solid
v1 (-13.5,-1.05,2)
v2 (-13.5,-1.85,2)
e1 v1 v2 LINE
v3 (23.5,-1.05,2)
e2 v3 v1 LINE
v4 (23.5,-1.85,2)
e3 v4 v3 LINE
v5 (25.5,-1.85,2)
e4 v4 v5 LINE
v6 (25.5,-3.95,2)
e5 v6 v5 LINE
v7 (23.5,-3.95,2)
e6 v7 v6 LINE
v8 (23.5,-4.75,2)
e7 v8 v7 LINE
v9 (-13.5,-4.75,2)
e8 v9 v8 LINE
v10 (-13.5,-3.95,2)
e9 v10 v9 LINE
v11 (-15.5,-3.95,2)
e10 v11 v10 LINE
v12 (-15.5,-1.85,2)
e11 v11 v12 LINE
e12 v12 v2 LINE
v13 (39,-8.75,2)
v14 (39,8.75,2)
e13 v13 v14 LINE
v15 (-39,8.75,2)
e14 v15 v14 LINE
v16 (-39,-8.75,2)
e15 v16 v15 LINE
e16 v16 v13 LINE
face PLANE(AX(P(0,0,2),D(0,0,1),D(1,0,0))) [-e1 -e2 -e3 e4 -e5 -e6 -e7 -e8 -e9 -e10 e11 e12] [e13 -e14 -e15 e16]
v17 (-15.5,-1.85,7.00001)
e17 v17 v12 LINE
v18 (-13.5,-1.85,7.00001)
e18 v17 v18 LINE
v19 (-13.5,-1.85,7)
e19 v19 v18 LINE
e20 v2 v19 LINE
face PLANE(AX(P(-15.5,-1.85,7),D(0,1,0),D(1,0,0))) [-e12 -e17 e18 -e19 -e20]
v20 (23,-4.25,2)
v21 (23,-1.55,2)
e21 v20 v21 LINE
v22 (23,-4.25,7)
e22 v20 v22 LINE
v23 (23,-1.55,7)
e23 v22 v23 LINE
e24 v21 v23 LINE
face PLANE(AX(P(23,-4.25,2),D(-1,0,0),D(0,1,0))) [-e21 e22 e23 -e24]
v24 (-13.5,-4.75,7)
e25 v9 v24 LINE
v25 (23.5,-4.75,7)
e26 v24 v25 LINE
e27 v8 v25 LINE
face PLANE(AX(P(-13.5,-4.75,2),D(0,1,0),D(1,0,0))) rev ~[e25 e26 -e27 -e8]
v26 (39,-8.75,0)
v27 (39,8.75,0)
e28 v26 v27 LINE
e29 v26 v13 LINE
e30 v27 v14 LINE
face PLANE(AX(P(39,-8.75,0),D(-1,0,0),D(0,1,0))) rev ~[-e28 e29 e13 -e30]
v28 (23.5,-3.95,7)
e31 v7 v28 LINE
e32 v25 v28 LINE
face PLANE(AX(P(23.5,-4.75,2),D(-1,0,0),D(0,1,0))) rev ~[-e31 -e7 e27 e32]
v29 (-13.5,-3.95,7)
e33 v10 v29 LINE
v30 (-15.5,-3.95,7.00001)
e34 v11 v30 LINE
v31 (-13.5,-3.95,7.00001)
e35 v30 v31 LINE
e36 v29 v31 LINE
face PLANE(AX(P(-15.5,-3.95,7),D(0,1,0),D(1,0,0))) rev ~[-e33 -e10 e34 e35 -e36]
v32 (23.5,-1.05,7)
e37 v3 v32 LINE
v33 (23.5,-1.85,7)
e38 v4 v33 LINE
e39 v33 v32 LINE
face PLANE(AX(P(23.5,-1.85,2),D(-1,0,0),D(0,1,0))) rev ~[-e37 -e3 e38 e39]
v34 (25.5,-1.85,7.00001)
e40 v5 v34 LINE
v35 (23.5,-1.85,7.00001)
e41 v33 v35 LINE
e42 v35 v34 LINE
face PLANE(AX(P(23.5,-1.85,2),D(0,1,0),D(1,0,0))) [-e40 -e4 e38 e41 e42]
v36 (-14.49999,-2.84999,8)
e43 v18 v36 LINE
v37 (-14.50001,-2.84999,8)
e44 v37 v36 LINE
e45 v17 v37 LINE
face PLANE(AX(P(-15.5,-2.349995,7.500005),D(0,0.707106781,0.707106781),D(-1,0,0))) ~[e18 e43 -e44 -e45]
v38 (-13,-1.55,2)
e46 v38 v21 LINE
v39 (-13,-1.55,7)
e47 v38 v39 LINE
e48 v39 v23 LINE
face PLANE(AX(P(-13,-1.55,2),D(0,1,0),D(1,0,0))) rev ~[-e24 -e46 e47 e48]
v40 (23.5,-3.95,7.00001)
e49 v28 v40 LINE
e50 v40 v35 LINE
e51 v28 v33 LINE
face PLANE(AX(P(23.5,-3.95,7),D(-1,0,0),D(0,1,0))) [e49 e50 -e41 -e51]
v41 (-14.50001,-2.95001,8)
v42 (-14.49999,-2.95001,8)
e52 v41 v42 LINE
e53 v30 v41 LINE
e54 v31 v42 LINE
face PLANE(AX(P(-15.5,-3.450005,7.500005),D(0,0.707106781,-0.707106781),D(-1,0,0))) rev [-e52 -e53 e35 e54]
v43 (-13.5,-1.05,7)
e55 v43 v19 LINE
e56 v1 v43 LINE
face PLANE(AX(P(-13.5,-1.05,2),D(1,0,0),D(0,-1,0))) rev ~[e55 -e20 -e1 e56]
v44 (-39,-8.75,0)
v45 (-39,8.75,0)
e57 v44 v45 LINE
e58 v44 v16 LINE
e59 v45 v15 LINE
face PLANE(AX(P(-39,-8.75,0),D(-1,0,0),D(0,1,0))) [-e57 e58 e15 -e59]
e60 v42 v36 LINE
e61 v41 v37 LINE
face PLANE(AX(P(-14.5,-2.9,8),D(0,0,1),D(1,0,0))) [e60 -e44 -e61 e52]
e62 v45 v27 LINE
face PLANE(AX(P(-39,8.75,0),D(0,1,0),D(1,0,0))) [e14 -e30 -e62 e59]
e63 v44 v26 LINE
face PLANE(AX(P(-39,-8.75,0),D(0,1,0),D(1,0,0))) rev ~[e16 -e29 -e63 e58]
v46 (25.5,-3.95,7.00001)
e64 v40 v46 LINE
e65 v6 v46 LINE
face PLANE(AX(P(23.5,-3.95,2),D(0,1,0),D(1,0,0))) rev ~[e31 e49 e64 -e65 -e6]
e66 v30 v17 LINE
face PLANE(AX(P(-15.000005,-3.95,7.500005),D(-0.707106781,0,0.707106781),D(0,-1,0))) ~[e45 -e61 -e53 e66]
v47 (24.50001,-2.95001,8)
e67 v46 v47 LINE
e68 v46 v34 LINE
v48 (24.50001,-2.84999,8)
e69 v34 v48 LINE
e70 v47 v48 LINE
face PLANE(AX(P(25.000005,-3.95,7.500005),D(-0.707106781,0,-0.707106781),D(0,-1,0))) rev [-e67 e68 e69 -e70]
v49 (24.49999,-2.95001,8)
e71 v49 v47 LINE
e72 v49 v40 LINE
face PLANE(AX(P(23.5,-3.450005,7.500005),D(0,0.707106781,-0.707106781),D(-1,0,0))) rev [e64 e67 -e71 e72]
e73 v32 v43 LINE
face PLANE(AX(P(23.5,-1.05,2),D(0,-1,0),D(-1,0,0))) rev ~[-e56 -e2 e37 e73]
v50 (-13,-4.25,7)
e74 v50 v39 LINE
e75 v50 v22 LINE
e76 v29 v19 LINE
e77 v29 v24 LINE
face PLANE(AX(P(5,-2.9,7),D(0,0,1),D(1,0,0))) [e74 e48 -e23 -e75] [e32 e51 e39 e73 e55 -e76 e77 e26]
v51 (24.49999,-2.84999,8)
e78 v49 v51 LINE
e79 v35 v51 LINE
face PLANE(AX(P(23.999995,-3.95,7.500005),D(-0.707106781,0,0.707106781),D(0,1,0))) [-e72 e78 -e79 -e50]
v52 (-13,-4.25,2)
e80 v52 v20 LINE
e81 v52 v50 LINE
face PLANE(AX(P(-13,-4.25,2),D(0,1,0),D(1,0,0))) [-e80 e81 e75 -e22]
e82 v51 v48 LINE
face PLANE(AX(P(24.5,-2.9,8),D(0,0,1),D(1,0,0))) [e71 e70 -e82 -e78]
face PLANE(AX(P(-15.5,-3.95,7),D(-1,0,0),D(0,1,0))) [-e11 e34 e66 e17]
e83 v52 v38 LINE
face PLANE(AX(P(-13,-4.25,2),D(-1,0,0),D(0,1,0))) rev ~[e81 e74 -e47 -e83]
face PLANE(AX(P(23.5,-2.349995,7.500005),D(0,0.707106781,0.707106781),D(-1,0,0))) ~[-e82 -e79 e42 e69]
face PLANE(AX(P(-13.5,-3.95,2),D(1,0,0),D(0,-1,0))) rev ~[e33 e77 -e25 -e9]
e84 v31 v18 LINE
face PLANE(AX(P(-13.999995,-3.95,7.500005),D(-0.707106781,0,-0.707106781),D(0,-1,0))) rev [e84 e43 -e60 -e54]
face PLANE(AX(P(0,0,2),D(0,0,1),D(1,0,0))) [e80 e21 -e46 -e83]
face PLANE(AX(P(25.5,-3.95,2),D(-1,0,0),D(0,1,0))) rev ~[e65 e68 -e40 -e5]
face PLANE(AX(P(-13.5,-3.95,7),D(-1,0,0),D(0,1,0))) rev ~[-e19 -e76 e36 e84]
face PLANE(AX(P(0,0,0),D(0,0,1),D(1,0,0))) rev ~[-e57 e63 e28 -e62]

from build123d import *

# Parameters (mm, degrees)
F0_W     = 78
F0_H     = 17.5
F1_DEPTH = 2
F2_W     = 36
F2_H     = 2.7
F2_W_2   = 2
F2_H_2   = 2.1
F3_DEPTH = 5
F4_W     = 2
F4_H     = 2.1
F5_DEPTH = 1
F6_SIZE  = 0.99999


# Not quite as in the source:
# - a fillet or chamfer is up to 0.001 mm smaller than in the source, because OpenCascade refuses the exact size


with BuildPart() as f1:
    # F0 (on Top) → F1 (new body)
    with BuildSketch(Plane.XY):
        Rectangle(F0_W, F0_H)
    extrude(amount=F1_DEPTH)

    # F2 (on face) → F3 (join)
    with BuildSketch(Plane.XY.offset(2)):
        Polygon((-13.5, -3.95), (-13.5, -4.75), (23.5, -4.75), (23.5, -3.95), (23.5, -1.85), (23.5, -1.05), (-13.5, -1.05), (-13.5, -1.85), align=None)
        with Locations((5, -2.9)):
            Rectangle(F2_W, F2_H, mode=Mode.SUBTRACT)
        with Locations((-14.5, -2.9)):
            Rectangle(F2_W_2, F2_H_2)
        with Locations((24.5, -2.9)):
            Rectangle(F2_W_2, F2_H_2)
    extrude(amount=F3_DEPTH)

    # F4 (on face) → F5 (join)
    with BuildSketch(Plane.XY.offset(7)):
        with Locations((-14.5, -2.9)):
            Rectangle(F4_W, F4_H)
        with Locations((24.5, -2.9)):
            Rectangle(F4_W, F4_H)
    extrude(amount=F5_DEPTH)

    # F6 (size 1 in the source; OpenCascade refuses exactly that, so slightly less here)
    f6_edges = [f1.edges().sort_by_distance(p)[0] for p in [
        (-15.5, -2.9, 8),
        (-14.5, -1.85, 8),
        (-13.5, -2.9, 8),
        (-14.5, -3.95, 8),
        (24.5, -1.85, 8),
        (23.5, -2.9, 8),
        (25.5, -2.9, 8),
        (24.5, -3.95, 8),
    ]]
    chamfer(f6_edges, length=F6_SIZE)


solid = f1.part
